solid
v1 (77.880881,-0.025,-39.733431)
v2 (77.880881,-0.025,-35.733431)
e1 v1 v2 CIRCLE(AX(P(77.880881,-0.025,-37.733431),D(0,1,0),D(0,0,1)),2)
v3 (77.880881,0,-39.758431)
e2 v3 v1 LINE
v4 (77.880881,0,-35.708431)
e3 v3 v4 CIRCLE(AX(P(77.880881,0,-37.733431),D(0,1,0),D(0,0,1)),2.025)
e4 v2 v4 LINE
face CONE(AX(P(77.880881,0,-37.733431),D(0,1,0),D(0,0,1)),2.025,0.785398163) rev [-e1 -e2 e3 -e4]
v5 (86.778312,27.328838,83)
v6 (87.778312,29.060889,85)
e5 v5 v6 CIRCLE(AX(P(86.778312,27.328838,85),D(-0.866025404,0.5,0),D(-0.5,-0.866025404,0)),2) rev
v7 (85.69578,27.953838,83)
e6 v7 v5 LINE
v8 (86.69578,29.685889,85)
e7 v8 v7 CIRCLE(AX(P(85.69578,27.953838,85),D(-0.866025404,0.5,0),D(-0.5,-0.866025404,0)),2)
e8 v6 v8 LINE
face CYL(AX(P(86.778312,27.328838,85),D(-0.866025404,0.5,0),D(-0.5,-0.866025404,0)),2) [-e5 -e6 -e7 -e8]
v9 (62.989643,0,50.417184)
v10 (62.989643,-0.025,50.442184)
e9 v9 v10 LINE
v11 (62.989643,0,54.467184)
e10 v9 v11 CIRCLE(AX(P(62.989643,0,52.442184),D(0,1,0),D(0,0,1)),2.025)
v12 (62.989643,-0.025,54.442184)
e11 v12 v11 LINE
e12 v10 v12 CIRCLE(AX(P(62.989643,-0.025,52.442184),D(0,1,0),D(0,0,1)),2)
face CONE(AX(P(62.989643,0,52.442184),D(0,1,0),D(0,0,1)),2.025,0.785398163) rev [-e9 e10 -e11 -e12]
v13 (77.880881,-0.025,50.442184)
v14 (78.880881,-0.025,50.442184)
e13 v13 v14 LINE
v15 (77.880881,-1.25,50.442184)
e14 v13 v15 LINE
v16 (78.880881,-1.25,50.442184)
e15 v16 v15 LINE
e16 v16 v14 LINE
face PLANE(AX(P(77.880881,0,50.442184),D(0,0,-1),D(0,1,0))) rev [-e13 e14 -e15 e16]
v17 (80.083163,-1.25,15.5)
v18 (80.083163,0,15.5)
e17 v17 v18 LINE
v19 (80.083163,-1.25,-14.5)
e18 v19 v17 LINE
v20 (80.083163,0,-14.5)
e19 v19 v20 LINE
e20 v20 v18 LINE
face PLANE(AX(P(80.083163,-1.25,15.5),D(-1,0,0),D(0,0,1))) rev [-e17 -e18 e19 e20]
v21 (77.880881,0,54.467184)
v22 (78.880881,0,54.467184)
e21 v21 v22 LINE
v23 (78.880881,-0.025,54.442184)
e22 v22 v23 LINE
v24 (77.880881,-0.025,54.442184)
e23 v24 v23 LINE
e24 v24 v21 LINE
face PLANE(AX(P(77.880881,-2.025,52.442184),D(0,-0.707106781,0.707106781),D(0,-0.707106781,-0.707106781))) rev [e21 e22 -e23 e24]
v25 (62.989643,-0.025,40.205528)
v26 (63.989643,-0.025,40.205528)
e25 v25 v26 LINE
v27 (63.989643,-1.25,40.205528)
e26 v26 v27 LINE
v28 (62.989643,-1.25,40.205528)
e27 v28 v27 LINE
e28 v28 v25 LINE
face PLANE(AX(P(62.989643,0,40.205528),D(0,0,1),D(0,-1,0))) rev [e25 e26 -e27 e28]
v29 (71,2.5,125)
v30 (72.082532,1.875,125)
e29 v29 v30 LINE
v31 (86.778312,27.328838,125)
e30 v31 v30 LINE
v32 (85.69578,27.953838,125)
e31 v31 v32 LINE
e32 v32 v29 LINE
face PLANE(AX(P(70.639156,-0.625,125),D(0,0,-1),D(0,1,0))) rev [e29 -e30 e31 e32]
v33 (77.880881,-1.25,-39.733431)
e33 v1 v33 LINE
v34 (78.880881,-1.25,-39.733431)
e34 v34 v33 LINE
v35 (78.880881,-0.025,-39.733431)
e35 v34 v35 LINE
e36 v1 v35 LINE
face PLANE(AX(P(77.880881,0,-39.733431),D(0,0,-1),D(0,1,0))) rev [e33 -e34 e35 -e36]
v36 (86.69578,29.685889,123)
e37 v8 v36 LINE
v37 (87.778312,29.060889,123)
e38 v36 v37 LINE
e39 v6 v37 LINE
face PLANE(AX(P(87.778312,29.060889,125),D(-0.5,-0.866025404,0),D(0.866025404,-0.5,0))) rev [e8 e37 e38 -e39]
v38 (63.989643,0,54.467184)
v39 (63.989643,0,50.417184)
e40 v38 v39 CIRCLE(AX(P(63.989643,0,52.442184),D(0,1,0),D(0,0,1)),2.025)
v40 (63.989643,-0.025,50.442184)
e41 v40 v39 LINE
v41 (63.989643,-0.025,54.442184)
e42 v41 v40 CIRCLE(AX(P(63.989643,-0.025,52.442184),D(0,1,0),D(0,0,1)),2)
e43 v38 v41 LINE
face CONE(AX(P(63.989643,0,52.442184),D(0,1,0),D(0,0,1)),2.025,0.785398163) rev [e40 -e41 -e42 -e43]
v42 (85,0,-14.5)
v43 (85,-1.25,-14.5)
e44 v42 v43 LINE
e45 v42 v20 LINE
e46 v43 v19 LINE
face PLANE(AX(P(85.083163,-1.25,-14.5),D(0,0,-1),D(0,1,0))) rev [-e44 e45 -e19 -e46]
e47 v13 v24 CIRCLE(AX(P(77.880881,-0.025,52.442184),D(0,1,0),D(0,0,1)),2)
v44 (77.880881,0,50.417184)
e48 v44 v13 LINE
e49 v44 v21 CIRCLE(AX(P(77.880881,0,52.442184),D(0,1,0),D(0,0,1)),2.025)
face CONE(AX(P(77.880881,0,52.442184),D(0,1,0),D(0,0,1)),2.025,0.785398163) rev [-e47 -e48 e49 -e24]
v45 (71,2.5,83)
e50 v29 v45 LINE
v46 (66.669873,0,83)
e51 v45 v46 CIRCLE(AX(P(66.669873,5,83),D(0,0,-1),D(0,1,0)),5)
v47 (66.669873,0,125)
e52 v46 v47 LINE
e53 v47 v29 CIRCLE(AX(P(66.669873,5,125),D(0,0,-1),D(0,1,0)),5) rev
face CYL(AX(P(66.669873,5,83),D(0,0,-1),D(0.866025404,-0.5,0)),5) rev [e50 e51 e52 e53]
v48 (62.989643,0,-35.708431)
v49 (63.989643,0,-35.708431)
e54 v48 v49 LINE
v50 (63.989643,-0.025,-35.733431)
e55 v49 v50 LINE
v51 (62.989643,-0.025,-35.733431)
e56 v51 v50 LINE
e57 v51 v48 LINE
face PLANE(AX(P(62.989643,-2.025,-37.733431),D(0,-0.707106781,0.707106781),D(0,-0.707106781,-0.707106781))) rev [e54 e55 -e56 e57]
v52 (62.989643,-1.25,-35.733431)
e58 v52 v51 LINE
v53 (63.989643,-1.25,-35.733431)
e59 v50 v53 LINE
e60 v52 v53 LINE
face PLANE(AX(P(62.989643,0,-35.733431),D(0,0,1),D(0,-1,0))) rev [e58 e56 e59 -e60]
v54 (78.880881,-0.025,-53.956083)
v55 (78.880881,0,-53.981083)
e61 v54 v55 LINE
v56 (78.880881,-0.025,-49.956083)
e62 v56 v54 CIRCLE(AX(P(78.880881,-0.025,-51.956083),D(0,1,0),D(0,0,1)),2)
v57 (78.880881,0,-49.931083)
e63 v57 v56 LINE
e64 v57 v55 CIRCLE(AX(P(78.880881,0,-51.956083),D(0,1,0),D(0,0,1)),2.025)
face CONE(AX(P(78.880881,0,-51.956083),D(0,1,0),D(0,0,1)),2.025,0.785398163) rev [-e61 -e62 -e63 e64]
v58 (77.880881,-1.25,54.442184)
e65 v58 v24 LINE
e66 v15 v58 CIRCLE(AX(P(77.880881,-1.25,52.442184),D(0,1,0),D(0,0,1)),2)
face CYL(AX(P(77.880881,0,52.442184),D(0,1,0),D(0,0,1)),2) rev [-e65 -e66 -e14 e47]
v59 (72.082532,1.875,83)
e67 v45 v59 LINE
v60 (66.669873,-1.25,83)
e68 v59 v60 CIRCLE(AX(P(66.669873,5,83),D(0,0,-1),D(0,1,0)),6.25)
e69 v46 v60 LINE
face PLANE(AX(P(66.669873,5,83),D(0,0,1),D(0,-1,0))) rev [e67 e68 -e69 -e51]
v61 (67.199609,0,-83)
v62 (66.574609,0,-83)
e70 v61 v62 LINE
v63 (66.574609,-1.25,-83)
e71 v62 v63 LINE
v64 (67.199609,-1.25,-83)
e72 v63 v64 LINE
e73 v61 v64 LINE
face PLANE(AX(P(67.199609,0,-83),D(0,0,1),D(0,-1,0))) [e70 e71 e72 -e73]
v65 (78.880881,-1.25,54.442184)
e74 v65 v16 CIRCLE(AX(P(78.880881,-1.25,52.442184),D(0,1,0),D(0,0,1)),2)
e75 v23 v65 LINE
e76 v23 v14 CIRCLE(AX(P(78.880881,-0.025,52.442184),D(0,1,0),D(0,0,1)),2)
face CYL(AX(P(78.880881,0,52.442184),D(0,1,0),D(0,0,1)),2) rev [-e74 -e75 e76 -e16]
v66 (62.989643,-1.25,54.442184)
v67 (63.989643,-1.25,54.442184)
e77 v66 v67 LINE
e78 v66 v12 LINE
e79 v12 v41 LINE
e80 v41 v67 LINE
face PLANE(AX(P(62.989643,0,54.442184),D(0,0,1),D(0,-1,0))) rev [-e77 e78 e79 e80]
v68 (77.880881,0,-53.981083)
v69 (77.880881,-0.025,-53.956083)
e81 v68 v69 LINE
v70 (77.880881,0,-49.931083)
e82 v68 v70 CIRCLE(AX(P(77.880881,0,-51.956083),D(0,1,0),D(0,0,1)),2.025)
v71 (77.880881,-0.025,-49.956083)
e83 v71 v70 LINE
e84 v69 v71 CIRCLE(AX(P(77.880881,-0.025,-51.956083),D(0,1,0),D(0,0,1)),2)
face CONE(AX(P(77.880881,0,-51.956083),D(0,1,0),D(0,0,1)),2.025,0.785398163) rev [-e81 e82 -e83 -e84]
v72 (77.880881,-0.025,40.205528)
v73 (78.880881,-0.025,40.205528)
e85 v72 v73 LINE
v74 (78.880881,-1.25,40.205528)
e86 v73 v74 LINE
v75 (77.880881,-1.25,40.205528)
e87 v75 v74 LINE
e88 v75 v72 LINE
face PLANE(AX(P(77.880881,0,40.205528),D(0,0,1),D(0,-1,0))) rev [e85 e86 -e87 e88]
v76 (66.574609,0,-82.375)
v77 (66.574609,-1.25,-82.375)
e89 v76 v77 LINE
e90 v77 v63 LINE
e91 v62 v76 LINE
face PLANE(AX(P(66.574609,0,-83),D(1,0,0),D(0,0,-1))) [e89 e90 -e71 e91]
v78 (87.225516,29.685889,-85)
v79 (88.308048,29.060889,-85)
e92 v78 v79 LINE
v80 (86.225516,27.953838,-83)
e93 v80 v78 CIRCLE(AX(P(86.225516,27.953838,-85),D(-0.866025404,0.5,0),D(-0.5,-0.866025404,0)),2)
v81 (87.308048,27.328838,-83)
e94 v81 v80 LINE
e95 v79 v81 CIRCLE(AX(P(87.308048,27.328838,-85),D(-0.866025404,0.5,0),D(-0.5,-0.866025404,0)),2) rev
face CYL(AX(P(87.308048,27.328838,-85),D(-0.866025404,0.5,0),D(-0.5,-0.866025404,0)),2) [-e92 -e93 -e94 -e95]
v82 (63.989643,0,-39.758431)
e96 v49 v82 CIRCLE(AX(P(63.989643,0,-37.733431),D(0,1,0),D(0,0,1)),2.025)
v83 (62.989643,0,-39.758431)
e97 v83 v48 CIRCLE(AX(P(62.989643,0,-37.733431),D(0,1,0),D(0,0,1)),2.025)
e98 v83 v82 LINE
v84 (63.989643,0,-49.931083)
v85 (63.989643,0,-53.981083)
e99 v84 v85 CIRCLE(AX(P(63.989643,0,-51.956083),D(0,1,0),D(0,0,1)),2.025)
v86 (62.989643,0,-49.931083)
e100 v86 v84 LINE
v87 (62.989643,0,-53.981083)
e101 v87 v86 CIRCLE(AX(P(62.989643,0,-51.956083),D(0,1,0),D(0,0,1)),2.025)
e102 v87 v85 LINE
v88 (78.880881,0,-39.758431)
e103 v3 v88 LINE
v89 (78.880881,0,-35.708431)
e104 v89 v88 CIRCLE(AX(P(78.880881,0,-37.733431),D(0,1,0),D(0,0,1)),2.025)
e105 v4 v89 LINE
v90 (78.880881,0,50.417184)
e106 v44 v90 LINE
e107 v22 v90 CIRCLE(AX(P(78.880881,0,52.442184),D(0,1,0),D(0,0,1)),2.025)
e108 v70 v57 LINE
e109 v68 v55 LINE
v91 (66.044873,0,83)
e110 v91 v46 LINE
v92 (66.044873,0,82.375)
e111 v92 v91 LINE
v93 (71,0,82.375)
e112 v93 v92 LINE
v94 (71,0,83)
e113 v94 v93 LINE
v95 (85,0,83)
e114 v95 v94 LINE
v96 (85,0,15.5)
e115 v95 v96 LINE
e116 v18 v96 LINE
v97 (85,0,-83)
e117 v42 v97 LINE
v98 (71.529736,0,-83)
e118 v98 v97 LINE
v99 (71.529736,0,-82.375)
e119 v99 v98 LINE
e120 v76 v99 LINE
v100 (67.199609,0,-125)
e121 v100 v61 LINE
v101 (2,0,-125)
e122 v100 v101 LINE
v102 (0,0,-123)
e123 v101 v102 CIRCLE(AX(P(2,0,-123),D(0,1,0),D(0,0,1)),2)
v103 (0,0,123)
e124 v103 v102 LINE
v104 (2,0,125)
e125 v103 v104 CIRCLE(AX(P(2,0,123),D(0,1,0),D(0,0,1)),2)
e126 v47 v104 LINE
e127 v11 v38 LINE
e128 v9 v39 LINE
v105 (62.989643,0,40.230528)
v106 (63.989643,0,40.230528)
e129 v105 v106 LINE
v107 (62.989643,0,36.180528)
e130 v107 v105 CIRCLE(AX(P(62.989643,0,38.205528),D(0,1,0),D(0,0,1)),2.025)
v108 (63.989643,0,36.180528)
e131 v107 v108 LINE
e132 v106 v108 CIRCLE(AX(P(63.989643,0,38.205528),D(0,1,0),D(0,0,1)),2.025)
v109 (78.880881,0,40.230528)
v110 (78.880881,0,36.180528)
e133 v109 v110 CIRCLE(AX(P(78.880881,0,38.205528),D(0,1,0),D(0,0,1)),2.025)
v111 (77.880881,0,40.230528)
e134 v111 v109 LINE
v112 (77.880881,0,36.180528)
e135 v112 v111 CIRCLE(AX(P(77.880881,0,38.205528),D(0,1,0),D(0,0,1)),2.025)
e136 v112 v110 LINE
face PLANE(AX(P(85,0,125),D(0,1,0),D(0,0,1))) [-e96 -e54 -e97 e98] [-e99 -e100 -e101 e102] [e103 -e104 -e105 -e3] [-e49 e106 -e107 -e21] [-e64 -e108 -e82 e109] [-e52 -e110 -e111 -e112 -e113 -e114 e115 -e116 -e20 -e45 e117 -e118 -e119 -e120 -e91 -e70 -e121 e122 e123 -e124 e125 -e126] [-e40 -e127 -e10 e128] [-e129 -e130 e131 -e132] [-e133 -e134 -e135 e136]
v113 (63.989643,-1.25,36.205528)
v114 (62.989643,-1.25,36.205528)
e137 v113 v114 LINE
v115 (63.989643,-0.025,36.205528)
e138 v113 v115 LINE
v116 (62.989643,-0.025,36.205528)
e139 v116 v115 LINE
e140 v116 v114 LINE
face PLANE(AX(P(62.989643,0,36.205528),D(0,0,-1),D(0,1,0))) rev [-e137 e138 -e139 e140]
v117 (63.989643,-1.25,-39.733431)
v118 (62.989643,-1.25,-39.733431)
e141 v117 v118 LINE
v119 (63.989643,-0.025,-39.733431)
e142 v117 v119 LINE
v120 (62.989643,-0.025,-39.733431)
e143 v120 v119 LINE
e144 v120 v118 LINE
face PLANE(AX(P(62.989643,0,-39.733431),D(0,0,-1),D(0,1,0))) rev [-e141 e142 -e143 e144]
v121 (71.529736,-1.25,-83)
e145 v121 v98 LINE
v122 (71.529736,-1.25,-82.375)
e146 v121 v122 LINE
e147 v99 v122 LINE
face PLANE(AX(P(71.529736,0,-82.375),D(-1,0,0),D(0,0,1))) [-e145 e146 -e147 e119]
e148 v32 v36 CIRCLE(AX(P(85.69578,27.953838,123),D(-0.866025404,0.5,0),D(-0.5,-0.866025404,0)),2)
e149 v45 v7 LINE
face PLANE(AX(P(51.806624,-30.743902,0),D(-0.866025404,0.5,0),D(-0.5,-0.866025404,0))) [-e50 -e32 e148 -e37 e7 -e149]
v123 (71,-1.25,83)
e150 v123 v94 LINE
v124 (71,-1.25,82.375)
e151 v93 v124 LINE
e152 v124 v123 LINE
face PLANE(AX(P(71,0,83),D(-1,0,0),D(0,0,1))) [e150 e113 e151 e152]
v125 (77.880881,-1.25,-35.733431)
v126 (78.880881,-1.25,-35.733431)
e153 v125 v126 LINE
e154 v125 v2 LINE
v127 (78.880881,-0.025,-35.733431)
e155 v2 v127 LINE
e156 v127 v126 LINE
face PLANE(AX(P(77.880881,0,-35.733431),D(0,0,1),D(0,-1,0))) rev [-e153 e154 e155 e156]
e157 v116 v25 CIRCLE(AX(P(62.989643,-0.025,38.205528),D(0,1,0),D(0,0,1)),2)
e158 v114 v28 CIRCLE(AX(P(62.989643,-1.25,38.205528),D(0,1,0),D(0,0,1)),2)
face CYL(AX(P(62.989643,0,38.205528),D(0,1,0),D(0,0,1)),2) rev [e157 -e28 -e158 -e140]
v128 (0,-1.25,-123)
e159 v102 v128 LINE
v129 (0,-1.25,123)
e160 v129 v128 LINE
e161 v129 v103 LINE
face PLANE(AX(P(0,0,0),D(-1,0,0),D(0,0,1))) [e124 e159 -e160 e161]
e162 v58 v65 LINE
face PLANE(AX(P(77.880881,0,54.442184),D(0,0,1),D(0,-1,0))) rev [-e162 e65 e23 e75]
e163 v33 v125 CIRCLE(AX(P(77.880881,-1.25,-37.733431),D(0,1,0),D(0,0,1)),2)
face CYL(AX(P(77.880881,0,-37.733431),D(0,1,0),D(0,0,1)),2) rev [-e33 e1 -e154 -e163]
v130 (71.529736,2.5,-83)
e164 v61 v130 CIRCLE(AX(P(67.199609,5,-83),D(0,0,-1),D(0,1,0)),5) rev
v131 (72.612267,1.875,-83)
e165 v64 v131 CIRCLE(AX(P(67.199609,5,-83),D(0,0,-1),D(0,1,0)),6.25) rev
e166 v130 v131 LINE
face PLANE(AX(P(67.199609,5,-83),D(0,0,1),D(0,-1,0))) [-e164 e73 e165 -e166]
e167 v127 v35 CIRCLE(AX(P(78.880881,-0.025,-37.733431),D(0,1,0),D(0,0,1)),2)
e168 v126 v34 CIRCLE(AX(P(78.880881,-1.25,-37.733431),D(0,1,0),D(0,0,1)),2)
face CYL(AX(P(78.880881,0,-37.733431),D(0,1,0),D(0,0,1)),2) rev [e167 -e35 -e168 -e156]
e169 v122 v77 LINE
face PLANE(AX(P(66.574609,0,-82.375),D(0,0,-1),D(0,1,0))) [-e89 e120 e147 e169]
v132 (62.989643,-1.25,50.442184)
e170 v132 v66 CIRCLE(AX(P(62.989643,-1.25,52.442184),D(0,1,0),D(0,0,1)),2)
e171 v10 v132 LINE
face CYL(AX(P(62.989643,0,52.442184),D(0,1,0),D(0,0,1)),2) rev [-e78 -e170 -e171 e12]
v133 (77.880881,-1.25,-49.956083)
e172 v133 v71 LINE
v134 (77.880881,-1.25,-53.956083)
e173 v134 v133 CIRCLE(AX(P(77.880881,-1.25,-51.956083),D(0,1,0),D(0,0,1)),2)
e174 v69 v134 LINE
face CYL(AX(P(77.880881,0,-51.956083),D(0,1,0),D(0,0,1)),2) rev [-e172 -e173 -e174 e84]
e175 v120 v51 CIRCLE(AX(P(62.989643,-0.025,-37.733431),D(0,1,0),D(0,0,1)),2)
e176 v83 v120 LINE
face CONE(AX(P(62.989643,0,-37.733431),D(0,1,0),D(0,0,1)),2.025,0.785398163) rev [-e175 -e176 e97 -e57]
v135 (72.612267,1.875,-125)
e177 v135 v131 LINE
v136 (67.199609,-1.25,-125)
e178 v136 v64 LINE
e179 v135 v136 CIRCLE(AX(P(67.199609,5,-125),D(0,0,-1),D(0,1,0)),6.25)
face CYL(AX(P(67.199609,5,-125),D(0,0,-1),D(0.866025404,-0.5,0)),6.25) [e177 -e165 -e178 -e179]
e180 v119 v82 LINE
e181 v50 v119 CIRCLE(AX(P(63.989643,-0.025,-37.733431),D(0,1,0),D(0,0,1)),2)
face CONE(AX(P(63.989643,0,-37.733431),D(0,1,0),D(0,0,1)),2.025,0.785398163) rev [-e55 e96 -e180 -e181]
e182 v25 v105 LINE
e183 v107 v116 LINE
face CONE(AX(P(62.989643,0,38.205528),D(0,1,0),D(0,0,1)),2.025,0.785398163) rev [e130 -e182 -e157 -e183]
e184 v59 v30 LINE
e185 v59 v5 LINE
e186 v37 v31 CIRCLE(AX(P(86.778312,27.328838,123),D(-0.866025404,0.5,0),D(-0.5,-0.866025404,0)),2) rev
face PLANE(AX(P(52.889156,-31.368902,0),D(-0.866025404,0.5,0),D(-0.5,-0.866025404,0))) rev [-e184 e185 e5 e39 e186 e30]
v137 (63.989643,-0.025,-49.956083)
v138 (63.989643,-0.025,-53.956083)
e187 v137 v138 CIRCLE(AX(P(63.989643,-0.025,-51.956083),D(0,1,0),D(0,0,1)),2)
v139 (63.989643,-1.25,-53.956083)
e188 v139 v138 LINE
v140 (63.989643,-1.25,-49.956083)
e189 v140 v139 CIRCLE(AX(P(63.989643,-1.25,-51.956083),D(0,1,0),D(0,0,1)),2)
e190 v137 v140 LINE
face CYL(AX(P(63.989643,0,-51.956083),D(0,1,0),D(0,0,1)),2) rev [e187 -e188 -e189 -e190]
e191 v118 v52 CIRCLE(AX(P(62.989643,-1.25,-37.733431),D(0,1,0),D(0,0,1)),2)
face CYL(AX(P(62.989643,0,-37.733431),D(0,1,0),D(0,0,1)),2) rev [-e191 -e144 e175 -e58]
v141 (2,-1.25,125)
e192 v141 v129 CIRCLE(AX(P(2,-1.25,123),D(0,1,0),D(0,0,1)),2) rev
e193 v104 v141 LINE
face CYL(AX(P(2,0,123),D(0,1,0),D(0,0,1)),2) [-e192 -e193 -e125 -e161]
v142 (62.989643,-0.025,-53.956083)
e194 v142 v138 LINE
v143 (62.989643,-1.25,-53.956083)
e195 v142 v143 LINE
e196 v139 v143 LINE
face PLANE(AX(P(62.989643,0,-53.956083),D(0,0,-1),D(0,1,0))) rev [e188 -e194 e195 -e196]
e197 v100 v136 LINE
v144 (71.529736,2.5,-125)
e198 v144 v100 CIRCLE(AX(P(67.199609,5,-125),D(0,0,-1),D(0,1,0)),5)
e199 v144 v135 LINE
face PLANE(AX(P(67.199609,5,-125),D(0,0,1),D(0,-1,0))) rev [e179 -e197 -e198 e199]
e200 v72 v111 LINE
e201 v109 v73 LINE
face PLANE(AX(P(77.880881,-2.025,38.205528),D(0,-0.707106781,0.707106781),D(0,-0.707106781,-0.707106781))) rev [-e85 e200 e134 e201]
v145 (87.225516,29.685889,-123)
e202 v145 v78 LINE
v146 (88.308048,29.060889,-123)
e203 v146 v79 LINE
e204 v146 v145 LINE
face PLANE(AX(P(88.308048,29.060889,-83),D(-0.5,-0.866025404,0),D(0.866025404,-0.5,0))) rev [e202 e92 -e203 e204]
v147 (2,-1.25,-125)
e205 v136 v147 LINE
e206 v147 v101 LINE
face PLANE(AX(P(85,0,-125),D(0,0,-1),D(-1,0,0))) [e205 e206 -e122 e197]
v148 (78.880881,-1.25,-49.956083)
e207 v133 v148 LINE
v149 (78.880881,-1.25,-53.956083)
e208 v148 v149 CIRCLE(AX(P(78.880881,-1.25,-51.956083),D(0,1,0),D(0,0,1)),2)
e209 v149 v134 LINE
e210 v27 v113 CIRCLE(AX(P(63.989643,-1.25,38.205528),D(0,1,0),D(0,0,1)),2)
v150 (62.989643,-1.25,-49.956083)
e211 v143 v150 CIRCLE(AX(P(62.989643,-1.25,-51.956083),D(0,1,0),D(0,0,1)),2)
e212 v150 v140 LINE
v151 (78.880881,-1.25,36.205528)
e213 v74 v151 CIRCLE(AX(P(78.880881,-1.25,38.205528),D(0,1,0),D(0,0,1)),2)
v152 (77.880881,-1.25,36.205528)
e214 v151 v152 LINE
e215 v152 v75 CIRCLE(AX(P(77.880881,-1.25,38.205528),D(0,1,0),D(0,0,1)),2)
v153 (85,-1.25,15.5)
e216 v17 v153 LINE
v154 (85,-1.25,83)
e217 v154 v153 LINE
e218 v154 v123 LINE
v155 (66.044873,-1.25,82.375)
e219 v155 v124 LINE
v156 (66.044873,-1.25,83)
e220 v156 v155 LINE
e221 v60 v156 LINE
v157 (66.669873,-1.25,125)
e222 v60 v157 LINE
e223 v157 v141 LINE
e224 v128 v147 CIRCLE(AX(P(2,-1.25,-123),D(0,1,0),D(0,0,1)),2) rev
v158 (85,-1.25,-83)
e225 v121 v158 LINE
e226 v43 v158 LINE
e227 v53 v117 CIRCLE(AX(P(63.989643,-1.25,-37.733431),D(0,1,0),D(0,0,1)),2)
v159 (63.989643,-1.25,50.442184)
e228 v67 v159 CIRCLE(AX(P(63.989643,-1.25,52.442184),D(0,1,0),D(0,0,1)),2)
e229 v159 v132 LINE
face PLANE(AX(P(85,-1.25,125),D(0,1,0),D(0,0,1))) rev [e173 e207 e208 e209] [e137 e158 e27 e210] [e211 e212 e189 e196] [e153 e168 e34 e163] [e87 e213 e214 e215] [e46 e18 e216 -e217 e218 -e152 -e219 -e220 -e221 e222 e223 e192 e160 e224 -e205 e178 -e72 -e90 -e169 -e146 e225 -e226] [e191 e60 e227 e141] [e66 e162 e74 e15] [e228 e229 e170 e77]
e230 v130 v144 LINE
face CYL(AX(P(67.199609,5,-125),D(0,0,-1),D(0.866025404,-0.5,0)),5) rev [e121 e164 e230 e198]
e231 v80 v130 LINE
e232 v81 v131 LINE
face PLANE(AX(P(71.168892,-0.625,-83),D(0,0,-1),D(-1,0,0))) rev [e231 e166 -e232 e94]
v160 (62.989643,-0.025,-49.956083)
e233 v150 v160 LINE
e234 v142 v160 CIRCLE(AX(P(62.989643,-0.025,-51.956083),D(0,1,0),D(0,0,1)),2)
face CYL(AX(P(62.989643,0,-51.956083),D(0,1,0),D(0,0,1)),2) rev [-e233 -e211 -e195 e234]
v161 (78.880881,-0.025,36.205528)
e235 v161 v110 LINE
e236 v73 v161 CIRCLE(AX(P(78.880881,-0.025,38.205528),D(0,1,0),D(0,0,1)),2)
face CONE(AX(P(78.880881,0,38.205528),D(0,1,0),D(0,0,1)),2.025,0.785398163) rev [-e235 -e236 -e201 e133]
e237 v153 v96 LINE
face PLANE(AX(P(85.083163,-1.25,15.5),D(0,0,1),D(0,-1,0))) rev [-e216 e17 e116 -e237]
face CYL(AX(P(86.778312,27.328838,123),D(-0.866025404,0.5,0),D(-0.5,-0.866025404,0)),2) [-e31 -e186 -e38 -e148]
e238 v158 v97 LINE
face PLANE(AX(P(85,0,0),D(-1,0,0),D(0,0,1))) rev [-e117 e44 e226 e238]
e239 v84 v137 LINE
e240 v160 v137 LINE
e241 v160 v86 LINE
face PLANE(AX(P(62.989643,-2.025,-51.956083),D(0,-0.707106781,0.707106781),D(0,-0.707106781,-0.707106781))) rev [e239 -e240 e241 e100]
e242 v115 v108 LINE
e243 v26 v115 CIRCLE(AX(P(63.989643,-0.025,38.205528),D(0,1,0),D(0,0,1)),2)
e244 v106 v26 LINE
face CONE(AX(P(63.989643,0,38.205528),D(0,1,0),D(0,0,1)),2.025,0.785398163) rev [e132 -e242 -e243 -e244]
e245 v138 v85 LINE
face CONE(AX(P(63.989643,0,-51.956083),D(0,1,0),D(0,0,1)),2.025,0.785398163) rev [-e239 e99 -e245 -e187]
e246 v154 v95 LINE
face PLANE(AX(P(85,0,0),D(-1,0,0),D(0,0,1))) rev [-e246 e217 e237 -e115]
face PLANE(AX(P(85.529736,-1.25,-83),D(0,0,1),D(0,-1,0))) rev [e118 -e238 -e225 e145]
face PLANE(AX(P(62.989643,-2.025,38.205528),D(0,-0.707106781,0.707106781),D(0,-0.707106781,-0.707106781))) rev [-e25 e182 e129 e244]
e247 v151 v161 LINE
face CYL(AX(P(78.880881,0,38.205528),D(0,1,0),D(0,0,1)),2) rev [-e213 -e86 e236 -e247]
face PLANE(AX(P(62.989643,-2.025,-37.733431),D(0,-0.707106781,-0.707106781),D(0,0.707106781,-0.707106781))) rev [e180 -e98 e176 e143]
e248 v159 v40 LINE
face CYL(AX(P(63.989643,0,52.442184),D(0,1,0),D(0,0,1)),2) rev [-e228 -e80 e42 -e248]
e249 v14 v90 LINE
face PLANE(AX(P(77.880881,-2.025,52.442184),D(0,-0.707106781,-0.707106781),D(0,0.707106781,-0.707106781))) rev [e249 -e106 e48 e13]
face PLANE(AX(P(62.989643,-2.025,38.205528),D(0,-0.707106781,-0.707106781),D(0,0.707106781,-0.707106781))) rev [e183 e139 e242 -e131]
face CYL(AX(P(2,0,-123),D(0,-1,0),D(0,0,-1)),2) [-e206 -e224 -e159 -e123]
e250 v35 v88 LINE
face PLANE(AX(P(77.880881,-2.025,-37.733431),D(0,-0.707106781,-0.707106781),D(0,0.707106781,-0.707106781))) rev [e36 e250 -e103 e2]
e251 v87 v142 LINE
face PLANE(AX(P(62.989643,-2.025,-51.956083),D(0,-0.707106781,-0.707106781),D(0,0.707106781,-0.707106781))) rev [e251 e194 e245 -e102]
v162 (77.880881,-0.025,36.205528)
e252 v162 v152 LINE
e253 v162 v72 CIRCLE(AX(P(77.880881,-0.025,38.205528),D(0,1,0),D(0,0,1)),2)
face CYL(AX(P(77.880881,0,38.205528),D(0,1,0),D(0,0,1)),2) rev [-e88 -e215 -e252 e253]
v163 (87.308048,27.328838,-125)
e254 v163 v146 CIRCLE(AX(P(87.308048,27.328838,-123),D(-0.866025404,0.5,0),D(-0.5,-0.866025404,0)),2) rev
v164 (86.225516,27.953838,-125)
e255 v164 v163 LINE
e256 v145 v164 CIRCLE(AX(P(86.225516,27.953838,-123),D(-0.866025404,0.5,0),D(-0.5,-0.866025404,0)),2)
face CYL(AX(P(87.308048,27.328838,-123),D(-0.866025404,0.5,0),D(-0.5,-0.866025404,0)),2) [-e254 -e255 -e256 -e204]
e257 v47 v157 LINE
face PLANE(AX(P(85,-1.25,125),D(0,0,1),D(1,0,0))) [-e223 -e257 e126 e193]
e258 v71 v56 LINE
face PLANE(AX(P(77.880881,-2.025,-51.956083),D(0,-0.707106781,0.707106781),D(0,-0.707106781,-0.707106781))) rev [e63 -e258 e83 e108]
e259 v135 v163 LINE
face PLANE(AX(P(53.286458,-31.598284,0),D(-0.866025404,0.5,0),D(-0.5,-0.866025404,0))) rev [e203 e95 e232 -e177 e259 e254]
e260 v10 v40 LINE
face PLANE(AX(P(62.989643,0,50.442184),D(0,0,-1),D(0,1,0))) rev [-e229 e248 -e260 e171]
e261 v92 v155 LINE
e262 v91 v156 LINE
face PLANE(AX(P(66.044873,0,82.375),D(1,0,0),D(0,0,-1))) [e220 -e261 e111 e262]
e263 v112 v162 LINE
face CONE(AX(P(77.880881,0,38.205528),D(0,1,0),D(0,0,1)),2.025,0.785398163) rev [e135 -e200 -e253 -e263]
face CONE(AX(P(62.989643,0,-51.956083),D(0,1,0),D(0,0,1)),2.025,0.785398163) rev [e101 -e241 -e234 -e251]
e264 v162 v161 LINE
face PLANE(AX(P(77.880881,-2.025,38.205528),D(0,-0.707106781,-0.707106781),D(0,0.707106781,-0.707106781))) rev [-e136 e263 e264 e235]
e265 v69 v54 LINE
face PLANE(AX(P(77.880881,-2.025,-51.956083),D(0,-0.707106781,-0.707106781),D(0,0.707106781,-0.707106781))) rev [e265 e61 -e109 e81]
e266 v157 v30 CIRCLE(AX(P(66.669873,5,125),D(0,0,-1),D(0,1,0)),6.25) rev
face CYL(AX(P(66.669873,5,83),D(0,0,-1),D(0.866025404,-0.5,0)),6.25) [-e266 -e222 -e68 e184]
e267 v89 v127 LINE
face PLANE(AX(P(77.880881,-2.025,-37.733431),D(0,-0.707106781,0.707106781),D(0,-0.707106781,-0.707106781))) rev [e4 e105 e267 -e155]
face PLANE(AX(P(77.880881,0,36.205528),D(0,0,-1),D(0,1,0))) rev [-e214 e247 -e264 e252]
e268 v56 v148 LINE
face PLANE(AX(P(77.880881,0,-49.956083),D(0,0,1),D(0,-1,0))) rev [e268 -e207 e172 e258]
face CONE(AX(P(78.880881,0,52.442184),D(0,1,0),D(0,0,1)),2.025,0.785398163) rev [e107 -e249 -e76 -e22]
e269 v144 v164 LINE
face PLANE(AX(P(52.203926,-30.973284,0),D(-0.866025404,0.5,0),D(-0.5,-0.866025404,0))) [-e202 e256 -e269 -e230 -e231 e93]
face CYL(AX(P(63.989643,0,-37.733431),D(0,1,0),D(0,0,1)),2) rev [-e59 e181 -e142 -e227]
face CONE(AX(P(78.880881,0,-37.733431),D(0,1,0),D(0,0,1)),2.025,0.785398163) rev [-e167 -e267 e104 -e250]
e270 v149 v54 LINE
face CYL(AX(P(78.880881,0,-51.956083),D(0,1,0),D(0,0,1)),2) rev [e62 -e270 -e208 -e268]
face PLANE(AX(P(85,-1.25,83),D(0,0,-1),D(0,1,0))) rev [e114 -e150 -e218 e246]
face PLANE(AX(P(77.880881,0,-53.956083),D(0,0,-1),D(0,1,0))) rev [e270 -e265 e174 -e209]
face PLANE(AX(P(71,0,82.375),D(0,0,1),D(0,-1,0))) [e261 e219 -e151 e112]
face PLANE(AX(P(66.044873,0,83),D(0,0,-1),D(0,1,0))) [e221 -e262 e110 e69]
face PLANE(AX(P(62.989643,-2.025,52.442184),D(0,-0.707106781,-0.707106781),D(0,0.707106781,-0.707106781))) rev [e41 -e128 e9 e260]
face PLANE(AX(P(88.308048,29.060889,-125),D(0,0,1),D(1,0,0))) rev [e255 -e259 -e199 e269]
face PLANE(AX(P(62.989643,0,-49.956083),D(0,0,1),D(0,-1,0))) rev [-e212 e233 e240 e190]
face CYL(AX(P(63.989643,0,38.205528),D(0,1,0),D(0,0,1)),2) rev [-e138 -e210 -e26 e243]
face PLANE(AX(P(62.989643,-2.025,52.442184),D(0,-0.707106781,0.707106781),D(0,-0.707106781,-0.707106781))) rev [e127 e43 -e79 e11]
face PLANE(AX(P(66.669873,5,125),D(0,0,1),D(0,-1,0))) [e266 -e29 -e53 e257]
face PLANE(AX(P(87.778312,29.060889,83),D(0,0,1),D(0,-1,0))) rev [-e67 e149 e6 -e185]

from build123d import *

# Parameters (mm, degrees)
SKETCH1_W                 = 250
SKETCH1_H                 = 1.25
BASE_FLANGE1_DEPTH        = 85
SKETCH9_W                 = 5
SKETCH9_H                 = 30
CUT_EXTRUDE1_DEPTH        = 152.167332781
SKETCH11_W                = 14
SKETCH11_H                = 42
CUT_EXTRUDE2_DEPTH        = 152.167332781
F_4_0MM_START             = -2
F_4_0MM_DOWEL_SLOT2_DEPTH = 3
EDGE_FLANGE1_START        = -125
EDGE_FLANGE1_DEPTH        = 42.625
EDGE_FLANGE1_START_2      = 82.375
EDGE_FLANGE1_2_DEPTH      = 42.625
EDGE_FLANGE1_START_3      = -83
EDGE_FLANGE1_3_DEPTH      = 0.625
EDGE_FLANGE1_4_DEPTH      = 0.625
EDGE_FLANGE1_5_DEPTH      = 42
EDGE_FLANGE1_START_4      = 83
EDGE_FLANGE1_6_DEPTH      = 42
FILLET4_R                 = 2


with BuildPart() as part:
    # Base-Flange1: sheet metal written as solids
    # Sketch1 → Base-Flange1 (new body)
    with BuildSketch(Plane(origin=(0, 0, 0), x_dir=(0, 0, -1), z_dir=(1, 0, 0))):
        with Locations((0, -0.625)):
            Rectangle(SKETCH1_W, SKETCH1_H)
    extrude(amount=BASE_FLANGE1_DEPTH)

    # Sketch9 → Cut-Extrude1 (cut, through all)
    with BuildSketch(Plane(origin=(0, 0, 0), x_dir=(1, 0, 0), z_dir=(0, 1, 0))):
        with Locations((82.583163083, -0.5)):
            Rectangle(SKETCH9_W, SKETCH9_H)
    extrude(amount=-CUT_EXTRUDE1_DEPTH, mode=Mode.SUBTRACT)

    # Sketch11 → Cut-Extrude2 (cut, through all)
    with BuildSketch(Plane(origin=(0, 0, 0), x_dir=(1, 0, 0), z_dir=(0, 1, 0))):
        with Locations((78.529735544, 104)):
            Rectangle(SKETCH11_W, SKETCH11_H)
        with Locations((78, -104)):
            Rectangle(SKETCH11_W, SKETCH11_H)
    extrude(amount=-CUT_EXTRUDE2_DEPTH, mode=Mode.SUBTRACT)

    # Ø4.0mm Dowel Slot2: read off the stored shape, not the designer's step
    # Ø4.0mm Dowel Slot2 outline → Ø4.0mm Dowel Slot2 (cut)
    with BuildSketch(Plane(origin=(0, 0, 0), x_dir=(1, 0, 0), z_dir=(0, 1, 0)).offset(F_4_0MM_START)):
        with BuildLine():
            Line((78.880880592, -50.442183635), (77.880880592, -50.442183635))
            ThreePointArc((77.880880592, -50.442183635), (75.880880592, -52.442183635), (77.880880592, -54.442183635))
            Line((77.880880592, -54.442183635), (78.880880592, -54.442183635))
            ThreePointArc((78.880880592, -54.442183635), (80.880880592, -52.442183635), (78.880880592, -50.442183635))
        make_face()
        with BuildLine():
            ThreePointArc((62.98964279, -50.442183635), (60.98964279, -52.442183635), (62.98964279, -54.442183635))
            Line((62.98964279, -54.442183635), (63.98964279, -54.442183635))
            ThreePointArc((63.98964279, -54.442183635), (65.98964279, -52.442183635), (63.98964279, -50.442183635))
            Line((63.98964279, -50.442183635), (62.98964279, -50.442183635))
        make_face()
        with BuildLine():
            Line((63.98964279, -36.205527502), (62.98964279, -36.205527502))
            ThreePointArc((62.98964279, -36.205527502), (60.98964279, -38.205527502), (62.98964279, -40.205527502))
            Line((62.98964279, -40.205527502), (63.98964279, -40.205527502))
            ThreePointArc((63.98964279, -40.205527502), (65.98964279, -38.205527502), (63.98964279, -36.205527502))
        make_face()
        with BuildLine():
            ThreePointArc((78.880880592, -40.205527502), (80.880880592, -38.205527502), (78.880880592, -36.205527502))
            Line((78.880880592, -36.205527502), (77.880880592, -36.205527502))
            ThreePointArc((77.880880592, -36.205527502), (75.880880592, -38.205527502), (77.880880592, -40.205527502))
            Line((77.880880592, -40.205527502), (78.880880592, -40.205527502))
        make_face()
        with BuildLine():
            ThreePointArc((63.98964279, 35.733431204), (65.98964279, 37.733431204), (63.98964279, 39.733431204))
            Line((63.98964279, 39.733431204), (62.98964279, 39.733431204))
            ThreePointArc((62.98964279, 39.733431204), (60.98964279, 37.733431204), (62.98964279, 35.733431204))
            Line((62.98964279, 35.733431204), (63.98964279, 35.733431204))
        make_face()
        with BuildLine():
            ThreePointArc((78.880880592, 35.733431204), (80.880880592, 37.733431204), (78.880880592, 39.733431204))
            Line((78.880880592, 39.733431204), (77.880880592, 39.733431204))
            ThreePointArc((77.880880592, 39.733431204), (75.880880592, 37.733431204), (77.880880592, 35.733431204))
            Line((77.880880592, 35.733431204), (78.880880592, 35.733431204))
        make_face()
        with BuildLine():
            Line((62.98964279, 49.956082819), (63.98964279, 49.956082819))
            ThreePointArc((63.98964279, 49.956082819), (65.98964279, 51.956082819), (63.98964279, 53.956082819))
            Line((63.98964279, 53.956082819), (62.98964279, 53.956082819))
            ThreePointArc((62.98964279, 53.956082819), (60.98964279, 51.956082819), (62.98964279, 49.956082819))
        make_face()
        with BuildLine():
            ThreePointArc((78.880880592, 49.956082819), (80.880880592, 51.956082819), (78.880880592, 53.956082819))
            Line((78.880880592, 53.956082819), (77.880880592, 53.956082819))
            ThreePointArc((77.880880592, 53.956082819), (75.880880592, 51.956082819), (77.880880592, 49.956082819))
            Line((77.880880592, 49.956082819), (78.880880592, 49.956082819))
        make_face()
    extrude(amount=F_4_0MM_DOWEL_SLOT2_DEPTH, mode=Mode.SUBTRACT)

    # 4.0mm Dowel Slot2 2: loft between two sections, ruled curve by curve
    f_4_0mm_dowel_slot2_2_from = [
        Edge.make_three_point_arc((78.880880592, -0.025, 54.442183635), (80.295094155, -0.025, 53.856397197), (80.880880592, -0.025, 52.442183635)),
        Edge.make_three_point_arc((80.880880592, -0.025, 52.442183635), (80.295094155, -0.025, 51.027970072), (78.880880592, -0.025, 50.442183635)),
        Edge.make_three_point_arc((77.880880592, -0.025, 50.442183635), (76.46666703, -0.025, 51.027970072), (75.880880592, -0.025, 52.442183635)),
        Edge.make_three_point_arc((75.880880592, -0.025, 52.442183635), (76.46666703, -0.025, 53.856397197), (77.880880592, -0.025, 54.442183635)),
        Edge.make_line((78.880880592, -0.025, 50.442183635), (77.880880592, -0.025, 50.442183635)),
        Edge.make_line((78.880880592, -0.025, 54.442183635), (77.880880592, -0.025, 54.442183635)),
    ]
    f_4_0mm_dowel_slot2_2_to = [
        Edge.make_three_point_arc((78.880880592, 0, 54.467183635), (80.312771824, 0, 53.874074866), (80.905880592, 0, 52.442183635)),
        Edge.make_three_point_arc((80.905880592, 0, 52.442183635), (80.312771824, 0, 51.010292403), (78.880880592, 0, 50.417183635)),
        Edge.make_three_point_arc((77.880880592, 0, 50.417183635), (76.44898936, 0, 51.010292403), (75.855880592, 0, 52.442183635)),
        Edge.make_three_point_arc((75.855880592, 0, 52.442183635), (76.44898936, 0, 53.874074866), (77.880880592, 0, 54.467183635)),
        Edge.make_line((78.880880592, 0, 50.417183635), (77.880880592, 0, 50.417183635)),
        Edge.make_line((78.880880592, 0, 54.467183635), (77.880880592, 0, 54.467183635)),
    ]
    f_4_0mm_dowel_slot2_2 = Solid(Shell([*[Face.make_surface_from_curves(f_4_0mm_dowel_slot2_2_from[k], f_4_0mm_dowel_slot2_2_to[k]) for k in range(6)], Face(Wire(f_4_0mm_dowel_slot2_2_from)), Face(Wire(f_4_0mm_dowel_slot2_2_to))]))
    add(f_4_0mm_dowel_slot2_2, mode=Mode.SUBTRACT)

    # 4.0mm Dowel Slot2 3: loft between two sections, ruled curve by curve
    f_4_0mm_dowel_slot2_3_from = [
        Edge.make_three_point_arc((63.98964279, -0.025, 54.442183635), (65.403856353, -0.025, 53.856397197), (65.98964279, -0.025, 52.442183635)),
        Edge.make_three_point_arc((65.98964279, -0.025, 52.442183635), (65.403856353, -0.025, 51.027970072), (63.98964279, -0.025, 50.442183635)),
        Edge.make_three_point_arc((62.98964279, -0.025, 50.442183635), (61.575429228, -0.025, 51.027970072), (60.98964279, -0.025, 52.442183635)),
        Edge.make_three_point_arc((60.98964279, -0.025, 52.442183635), (61.575429228, -0.025, 53.856397197), (62.98964279, -0.025, 54.442183635)),
        Edge.make_line((63.98964279, -0.025, 50.442183635), (62.98964279, -0.025, 50.442183635)),
        Edge.make_line((63.98964279, -0.025, 54.442183635), (62.98964279, -0.025, 54.442183635)),
    ]
    f_4_0mm_dowel_slot2_3_to = [
        Edge.make_three_point_arc((63.98964279, 0, 54.467183635), (65.421534022, 0, 53.874074866), (66.01464279, 0, 52.442183635)),
        Edge.make_three_point_arc((66.01464279, 0, 52.442183635), (65.421534022, 0, 51.010292403), (63.98964279, 0, 50.417183635)),
        Edge.make_three_point_arc((62.98964279, 0, 50.417183635), (61.557751558, 0, 51.010292403), (60.96464279, 0, 52.442183635)),
        Edge.make_three_point_arc((60.96464279, 0, 52.442183635), (61.557751558, 0, 53.874074866), (62.98964279, 0, 54.467183635)),
        Edge.make_line((63.98964279, 0, 50.417183635), (62.98964279, 0, 50.417183635)),
        Edge.make_line((63.98964279, 0, 54.467183635), (62.98964279, 0, 54.467183635)),
    ]
    f_4_0mm_dowel_slot2_3 = Solid(Shell([*[Face.make_surface_from_curves(f_4_0mm_dowel_slot2_3_from[k], f_4_0mm_dowel_slot2_3_to[k]) for k in range(6)], Face(Wire(f_4_0mm_dowel_slot2_3_from)), Face(Wire(f_4_0mm_dowel_slot2_3_to))]))
    add(f_4_0mm_dowel_slot2_3, mode=Mode.SUBTRACT)

    # 4.0mm Dowel Slot2 4: loft between two sections, ruled curve by curve
    f_4_0mm_dowel_slot2_4_from = [
        Edge.make_three_point_arc((63.98964279, -0.025, 40.205527502), (65.403856353, -0.025, 39.619741064), (65.98964279, -0.025, 38.205527502)),
        Edge.make_three_point_arc((65.98964279, -0.025, 38.205527502), (65.403856353, -0.025, 36.791313939), (63.98964279, -0.025, 36.205527502)),
        Edge.make_three_point_arc((62.98964279, -0.025, 36.205527502), (61.575429228, -0.025, 36.791313939), (60.98964279, -0.025, 38.205527502)),
        Edge.make_three_point_arc((60.98964279, -0.025, 38.205527502), (61.575429228, -0.025, 39.619741064), (62.98964279, -0.025, 40.205527502)),
        Edge.make_line((63.98964279, -0.025, 36.205527502), (62.98964279, -0.025, 36.205527502)),
        Edge.make_line((63.98964279, -0.025, 40.205527502), (62.98964279, -0.025, 40.205527502)),
    ]
    f_4_0mm_dowel_slot2_4_to = [
        Edge.make_three_point_arc((63.98964279, 0, 40.230527502), (65.421534022, 0, 39.637418734), (66.01464279, 0, 38.205527502)),
        Edge.make_three_point_arc((66.01464279, 0, 38.205527502), (65.421534022, 0, 36.77363627), (63.98964279, 0, 36.180527502)),
        Edge.make_three_point_arc((62.98964279, 0, 36.180527502), (61.557751558, 0, 36.77363627), (60.96464279, 0, 38.205527502)),
        Edge.make_three_point_arc((60.96464279, 0, 38.205527502), (61.557751558, 0, 39.637418734), (62.98964279, 0, 40.230527502)),
        Edge.make_line((63.98964279, 0, 36.180527502), (62.98964279, 0, 36.180527502)),
        Edge.make_line((63.98964279, 0, 40.230527502), (62.98964279, 0, 40.230527502)),
    ]
    f_4_0mm_dowel_slot2_4 = Solid(Shell([*[Face.make_surface_from_curves(f_4_0mm_dowel_slot2_4_from[k], f_4_0mm_dowel_slot2_4_to[k]) for k in range(6)], Face(Wire(f_4_0mm_dowel_slot2_4_from)), Face(Wire(f_4_0mm_dowel_slot2_4_to))]))
    add(f_4_0mm_dowel_slot2_4, mode=Mode.SUBTRACT)

    # 4.0mm Dowel Slot2 5: loft between two sections, ruled curve by curve
    f_4_0mm_dowel_slot2_5_from = [
        Edge.make_three_point_arc((78.880880592, -0.025, 40.205527502), (80.295094155, -0.025, 39.619741064), (80.880880592, -0.025, 38.205527502)),
        Edge.make_three_point_arc((80.880880592, -0.025, 38.205527502), (80.295094155, -0.025, 36.791313939), (78.880880592, -0.025, 36.205527502)),
        Edge.make_three_point_arc((77.880880592, -0.025, 36.205527502), (76.46666703, -0.025, 36.791313939), (75.880880592, -0.025, 38.205527502)),
        Edge.make_three_point_arc((75.880880592, -0.025, 38.205527502), (76.46666703, -0.025, 39.619741064), (77.880880592, -0.025, 40.205527502)),
        Edge.make_line((78.880880592, -0.025, 36.205527502), (77.880880592, -0.025, 36.205527502)),
        Edge.make_line((78.880880592, -0.025, 40.205527502), (77.880880592, -0.025, 40.205527502)),
    ]
    f_4_0mm_dowel_slot2_5_to = [
        Edge.make_three_point_arc((78.880880592, 0, 40.230527502), (80.312771824, 0, 39.637418734), (80.905880592, 0, 38.205527502)),
        Edge.make_three_point_arc((80.905880592, 0, 38.205527502), (80.312771824, 0, 36.77363627), (78.880880592, 0, 36.180527502)),
        Edge.make_three_point_arc((77.880880592, 0, 36.180527502), (76.44898936, 0, 36.77363627), (75.855880592, 0, 38.205527502)),
        Edge.make_three_point_arc((75.855880592, 0, 38.205527502), (76.44898936, 0, 39.637418734), (77.880880592, 0, 40.230527502)),
        Edge.make_line((78.880880592, 0, 36.180527502), (77.880880592, 0, 36.180527502)),
        Edge.make_line((78.880880592, 0, 40.230527502), (77.880880592, 0, 40.230527502)),
    ]
    f_4_0mm_dowel_slot2_5 = Solid(Shell([*[Face.make_surface_from_curves(f_4_0mm_dowel_slot2_5_from[k], f_4_0mm_dowel_slot2_5_to[k]) for k in range(6)], Face(Wire(f_4_0mm_dowel_slot2_5_from)), Face(Wire(f_4_0mm_dowel_slot2_5_to))]))
    add(f_4_0mm_dowel_slot2_5, mode=Mode.SUBTRACT)

    # 4.0mm Dowel Slot2 6: loft between two sections, ruled curve by curve
    f_4_0mm_dowel_slot2_6_from = [
        Edge.make_three_point_arc((63.98964279, -0.025, -35.733431204), (65.403856353, -0.025, -36.319217642), (65.98964279, -0.025, -37.733431204)),
        Edge.make_three_point_arc((65.98964279, -0.025, -37.733431204), (65.403856353, -0.025, -39.147644767), (63.98964279, -0.025, -39.733431204)),
        Edge.make_three_point_arc((62.98964279, -0.025, -39.733431204), (61.575429228, -0.025, -39.147644767), (60.98964279, -0.025, -37.733431204)),
        Edge.make_three_point_arc((60.98964279, -0.025, -37.733431204), (61.575429228, -0.025, -36.319217642), (62.98964279, -0.025, -35.733431204)),
        Edge.make_line((63.98964279, -0.025, -39.733431204), (62.98964279, -0.025, -39.733431204)),
        Edge.make_line((63.98964279, -0.025, -35.733431204), (62.98964279, -0.025, -35.733431204)),
    ]
    f_4_0mm_dowel_slot2_6_to = [
        Edge.make_three_point_arc((63.98964279, 0, -35.708431204), (65.421534022, 0, -36.301539973), (66.01464279, 0, -37.733431204)),
        Edge.make_three_point_arc((66.01464279, 0, -37.733431204), (65.421534022, 0, -39.165322436), (63.98964279, 0, -39.758431204)),
        Edge.make_three_point_arc((62.98964279, 0, -39.758431204), (61.557751558, 0, -39.165322436), (60.96464279, 0, -37.733431204)),
        Edge.make_three_point_arc((60.96464279, 0, -37.733431204), (61.557751558, 0, -36.301539973), (62.98964279, 0, -35.708431204)),
        Edge.make_line((63.98964279, 0, -39.758431204), (62.98964279, 0, -39.758431204)),
        Edge.make_line((63.98964279, 0, -35.708431204), (62.98964279, 0, -35.708431204)),
    ]
    f_4_0mm_dowel_slot2_6 = Solid(Shell([*[Face.make_surface_from_curves(f_4_0mm_dowel_slot2_6_from[k], f_4_0mm_dowel_slot2_6_to[k]) for k in range(6)], Face(Wire(f_4_0mm_dowel_slot2_6_from)), Face(Wire(f_4_0mm_dowel_slot2_6_to))]))
    add(f_4_0mm_dowel_slot2_6, mode=Mode.SUBTRACT)

    # 4.0mm Dowel Slot2 7: loft between two sections, ruled curve by curve
    f_4_0mm_dowel_slot2_7_from = [
        Edge.make_three_point_arc((78.880880592, -0.025, -35.733431204), (80.295094155, -0.025, -36.319217642), (80.880880592, -0.025, -37.733431204)),
        Edge.make_three_point_arc((80.880880592, -0.025, -37.733431204), (80.295094155, -0.025, -39.147644767), (78.880880592, -0.025, -39.733431204)),
        Edge.make_three_point_arc((77.880880592, -0.025, -39.733431204), (76.46666703, -0.025, -39.147644767), (75.880880592, -0.025, -37.733431204)),
        Edge.make_three_point_arc((75.880880592, -0.025, -37.733431204), (76.46666703, -0.025, -36.319217642), (77.880880592, -0.025, -35.733431204)),
        Edge.make_line((78.880880592, -0.025, -39.733431204), (77.880880592, -0.025, -39.733431204)),
        Edge.make_line((78.880880592, -0.025, -35.733431204), (77.880880592, -0.025, -35.733431204)),
    ]
    f_4_0mm_dowel_slot2_7_to = [
        Edge.make_three_point_arc((78.880880592, 0, -35.708431204), (80.312771824, 0, -36.301539973), (80.905880592, 0, -37.733431204)),
        Edge.make_three_point_arc((80.905880592, 0, -37.733431204), (80.312771824, 0, -39.165322436), (78.880880592, 0, -39.758431204)),
        Edge.make_three_point_arc((77.880880592, 0, -39.758431204), (76.44898936, 0, -39.165322436), (75.855880592, 0, -37.733431204)),
        Edge.make_three_point_arc((75.855880592, 0, -37.733431204), (76.44898936, 0, -36.301539973), (77.880880592, 0, -35.708431204)),
        Edge.make_line((78.880880592, 0, -39.758431204), (77.880880592, 0, -39.758431204)),
        Edge.make_line((78.880880592, 0, -35.708431204), (77.880880592, 0, -35.708431204)),
    ]
    f_4_0mm_dowel_slot2_7 = Solid(Shell([*[Face.make_surface_from_curves(f_4_0mm_dowel_slot2_7_from[k], f_4_0mm_dowel_slot2_7_to[k]) for k in range(6)], Face(Wire(f_4_0mm_dowel_slot2_7_from)), Face(Wire(f_4_0mm_dowel_slot2_7_to))]))
    add(f_4_0mm_dowel_slot2_7, mode=Mode.SUBTRACT)

    # 4.0mm Dowel Slot2 8: loft between two sections, ruled curve by curve
    f_4_0mm_dowel_slot2_8_from = [
        Edge.make_three_point_arc((63.98964279, -0.025, -49.956082819), (65.403856353, -0.025, -50.541869257), (65.98964279, -0.025, -51.956082819)),
        Edge.make_three_point_arc((65.98964279, -0.025, -51.956082819), (65.403856353, -0.025, -53.370296382), (63.98964279, -0.025, -53.956082819)),
        Edge.make_three_point_arc((62.98964279, -0.025, -53.956082819), (61.575429228, -0.025, -53.370296382), (60.98964279, -0.025, -51.956082819)),
        Edge.make_three_point_arc((60.98964279, -0.025, -51.956082819), (61.575429228, -0.025, -50.541869257), (62.98964279, -0.025, -49.956082819)),
        Edge.make_line((63.98964279, -0.025, -53.956082819), (62.98964279, -0.025, -53.956082819)),
        Edge.make_line((63.98964279, -0.025, -49.956082819), (62.98964279, -0.025, -49.956082819)),
    ]
    f_4_0mm_dowel_slot2_8_to = [
        Edge.make_three_point_arc((63.98964279, 0, -49.931082819), (65.421534022, 0, -50.524191588), (66.01464279, 0, -51.956082819)),
        Edge.make_three_point_arc((66.01464279, 0, -51.956082819), (65.421534022, 0, -53.387974051), (63.98964279, 0, -53.981082819)),
        Edge.make_three_point_arc((62.98964279, 0, -53.981082819), (61.557751558, 0, -53.387974051), (60.96464279, 0, -51.956082819)),
        Edge.make_three_point_arc((60.96464279, 0, -51.956082819), (61.557751558, 0, -50.524191588), (62.98964279, 0, -49.931082819)),
        Edge.make_line((63.98964279, 0, -53.981082819), (62.98964279, 0, -53.981082819)),
        Edge.make_line((63.98964279, 0, -49.931082819), (62.98964279, 0, -49.931082819)),
    ]
    f_4_0mm_dowel_slot2_8 = Solid(Shell([*[Face.make_surface_from_curves(f_4_0mm_dowel_slot2_8_from[k], f_4_0mm_dowel_slot2_8_to[k]) for k in range(6)], Face(Wire(f_4_0mm_dowel_slot2_8_from)), Face(Wire(f_4_0mm_dowel_slot2_8_to))]))
    add(f_4_0mm_dowel_slot2_8, mode=Mode.SUBTRACT)

    # 4.0mm Dowel Slot2 9: loft between two sections, ruled curve by curve
    f_4_0mm_dowel_slot2_9_from = [
        Edge.make_three_point_arc((78.880880592, -0.025, -49.956082819), (80.295094155, -0.025, -50.541869257), (80.880880592, -0.025, -51.956082819)),
        Edge.make_three_point_arc((80.880880592, -0.025, -51.956082819), (80.295094155, -0.025, -53.370296382), (78.880880592, -0.025, -53.956082819)),
        Edge.make_three_point_arc((77.880880592, -0.025, -53.956082819), (76.46666703, -0.025, -53.370296382), (75.880880592, -0.025, -51.956082819)),
        Edge.make_three_point_arc((75.880880592, -0.025, -51.956082819), (76.46666703, -0.025, -50.541869257), (77.880880592, -0.025, -49.956082819)),
        Edge.make_line((78.880880592, -0.025, -53.956082819), (77.880880592, -0.025, -53.956082819)),
        Edge.make_line((78.880880592, -0.025, -49.956082819), (77.880880592, -0.025, -49.956082819)),
    ]
    f_4_0mm_dowel_slot2_9_to = [
        Edge.make_three_point_arc((78.880880592, 0, -49.931082819), (80.312771824, 0, -50.524191588), (80.905880592, 0, -51.956082819)),
        Edge.make_three_point_arc((80.905880592, 0, -51.956082819), (80.312771824, 0, -53.387974051), (78.880880592, 0, -53.981082819)),
        Edge.make_three_point_arc((77.880880592, 0, -53.981082819), (76.44898936, 0, -53.387974051), (75.855880592, 0, -51.956082819)),
        Edge.make_three_point_arc((75.855880592, 0, -51.956082819), (76.44898936, 0, -50.524191588), (77.880880592, 0, -49.931082819)),
        Edge.make_line((78.880880592, 0, -53.981082819), (77.880880592, 0, -53.981082819)),
        Edge.make_line((78.880880592, 0, -49.931082819), (77.880880592, 0, -49.931082819)),
    ]
    f_4_0mm_dowel_slot2_9 = Solid(Shell([*[Face.make_surface_from_curves(f_4_0mm_dowel_slot2_9_from[k], f_4_0mm_dowel_slot2_9_to[k]) for k in range(6)], Face(Wire(f_4_0mm_dowel_slot2_9_from)), Face(Wire(f_4_0mm_dowel_slot2_9_to))]))
    add(f_4_0mm_dowel_slot2_9, mode=Mode.SUBTRACT)

    # Edge-Flange1: read off the stored shape, not the designer's step
    # Edge-Flange1 outline → Edge-Flange1 (cut)
    with BuildSketch(Plane.XY.offset(EDGE_FLANGE1_START)):
        with BuildLine():
            ThreePointArc((70.949608526, 0), (69.176032063, -0.929270613), (67.199608525, -1.25))
            Line((67.199608525, -1.25), (71.529735544, -1.25))
            Line((71.529735544, -1.25), (71.529735544, 0))
            Line((71.529735544, 0), (70.949608526, 0))
        make_face()
    extrude(amount=EDGE_FLANGE1_DEPTH, mode=Mode.SUBTRACT)

    # Edge-Flange1 2 outline → Edge-Flange1 2 (cut)
    with BuildSketch(Plane.XY.offset(EDGE_FLANGE1_START_2)):
        with BuildLine():
            ThreePointArc((70.419872982, 0), (68.646296519, -0.929270613), (66.669872981, -1.25))
            Line((66.669872981, -1.25), (71, -1.25))
            Line((71, -1.25), (71, 0))
            Line((71, 0), (70.419872982, 0))
        make_face()
    extrude(amount=EDGE_FLANGE1_2_DEPTH, mode=Mode.SUBTRACT)

    # Edge-Flange1 3 outline → Edge-Flange1 3 (cut)
    with BuildSketch(Plane.XY.offset(EDGE_FLANGE1_START_3)):
        with BuildLine():
            Line((66.574608525, 0), (66.574608525, -1.25))
            Line((66.574608525, -1.25), (67.199608525, -1.25))
            ThreePointArc((67.199608525, -1.25), (69.176032063, -0.929270613), (70.949608526, 0))
            Line((70.949608526, 0), (66.574608525, 0))
        make_face()
    extrude(amount=EDGE_FLANGE1_3_DEPTH, mode=Mode.SUBTRACT)

    # Edge-Flange1 4 outline → Edge-Flange1 4 (cut)
    with BuildSketch(Plane.XY.offset(EDGE_FLANGE1_START_2)):
        with BuildLine():
            Line((66.044872981, -1.25), (66.669872981, -1.25))
            ThreePointArc((66.669872981, -1.25), (68.646296519, -0.929270613), (70.419872982, 0))
            Line((70.419872982, 0), (66.044872981, 0))
            Line((66.044872981, 0), (66.044872981, -1.25))
        make_face()
    extrude(amount=EDGE_FLANGE1_4_DEPTH, mode=Mode.SUBTRACT)

    # Edge-Flange1 5 outline → Edge-Flange1 5 (add)
    with BuildSketch(Plane.XY.offset(EDGE_FLANGE1_START)):
        with BuildLine():
            Line((67.199608525, 0), (70.949608526, 0))
            ThreePointArc((70.949608526, 0), (71.875876824, 0.853312792), (72.612267299, 1.875))
            Line((72.612267299, 1.875), (88.308047708, 29.060889132))
            Line((88.308047708, 29.060889132), (87.225515953, 29.685889132))
            Line((87.225515953, 29.685889132), (71.529735544, 2.5))
            ThreePointArc((71.529735544, 2.5), (69.699608525, 0.669872981), (67.199608525, 0))
        make_face()
    extrude(amount=EDGE_FLANGE1_5_DEPTH)

    # Edge-Flange1 6 outline → Edge-Flange1 6 (add)
    with BuildSketch(Plane.XY.offset(EDGE_FLANGE1_START_4)):
        with BuildLine():
            ThreePointArc((71, 2.5), (69.169872981, 0.669872981), (66.669872981, 0))
            Line((66.669872981, 0), (70.419872982, 0))
            ThreePointArc((70.419872982, 0), (71.34614128, 0.853312792), (72.082531755, 1.875))
            Line((72.082531755, 1.875), (87.778312164, 29.060889132))
            Line((87.778312164, 29.060889132), (86.695780409, 29.685889132))
            Line((86.695780409, 29.685889132), (71, 2.5))
        make_face()
    extrude(amount=EDGE_FLANGE1_6_DEPTH)

    # Fillet4
    fillet4_edges = [part.edges().sort_by_distance(p)[0] for p in [
        (87.766781831, 29.373389132, -83),
        (87.766781831, 29.373389132, -125),
        (87.237046287, 29.373389132, 125),
        (87.237046287, 29.373389132, 83),
        (0, -0.625, 125),
        (0, -0.625, -125),
    ]]
    fillet(fillet4_edges, radius=FILLET4_R)


solid = part.part
